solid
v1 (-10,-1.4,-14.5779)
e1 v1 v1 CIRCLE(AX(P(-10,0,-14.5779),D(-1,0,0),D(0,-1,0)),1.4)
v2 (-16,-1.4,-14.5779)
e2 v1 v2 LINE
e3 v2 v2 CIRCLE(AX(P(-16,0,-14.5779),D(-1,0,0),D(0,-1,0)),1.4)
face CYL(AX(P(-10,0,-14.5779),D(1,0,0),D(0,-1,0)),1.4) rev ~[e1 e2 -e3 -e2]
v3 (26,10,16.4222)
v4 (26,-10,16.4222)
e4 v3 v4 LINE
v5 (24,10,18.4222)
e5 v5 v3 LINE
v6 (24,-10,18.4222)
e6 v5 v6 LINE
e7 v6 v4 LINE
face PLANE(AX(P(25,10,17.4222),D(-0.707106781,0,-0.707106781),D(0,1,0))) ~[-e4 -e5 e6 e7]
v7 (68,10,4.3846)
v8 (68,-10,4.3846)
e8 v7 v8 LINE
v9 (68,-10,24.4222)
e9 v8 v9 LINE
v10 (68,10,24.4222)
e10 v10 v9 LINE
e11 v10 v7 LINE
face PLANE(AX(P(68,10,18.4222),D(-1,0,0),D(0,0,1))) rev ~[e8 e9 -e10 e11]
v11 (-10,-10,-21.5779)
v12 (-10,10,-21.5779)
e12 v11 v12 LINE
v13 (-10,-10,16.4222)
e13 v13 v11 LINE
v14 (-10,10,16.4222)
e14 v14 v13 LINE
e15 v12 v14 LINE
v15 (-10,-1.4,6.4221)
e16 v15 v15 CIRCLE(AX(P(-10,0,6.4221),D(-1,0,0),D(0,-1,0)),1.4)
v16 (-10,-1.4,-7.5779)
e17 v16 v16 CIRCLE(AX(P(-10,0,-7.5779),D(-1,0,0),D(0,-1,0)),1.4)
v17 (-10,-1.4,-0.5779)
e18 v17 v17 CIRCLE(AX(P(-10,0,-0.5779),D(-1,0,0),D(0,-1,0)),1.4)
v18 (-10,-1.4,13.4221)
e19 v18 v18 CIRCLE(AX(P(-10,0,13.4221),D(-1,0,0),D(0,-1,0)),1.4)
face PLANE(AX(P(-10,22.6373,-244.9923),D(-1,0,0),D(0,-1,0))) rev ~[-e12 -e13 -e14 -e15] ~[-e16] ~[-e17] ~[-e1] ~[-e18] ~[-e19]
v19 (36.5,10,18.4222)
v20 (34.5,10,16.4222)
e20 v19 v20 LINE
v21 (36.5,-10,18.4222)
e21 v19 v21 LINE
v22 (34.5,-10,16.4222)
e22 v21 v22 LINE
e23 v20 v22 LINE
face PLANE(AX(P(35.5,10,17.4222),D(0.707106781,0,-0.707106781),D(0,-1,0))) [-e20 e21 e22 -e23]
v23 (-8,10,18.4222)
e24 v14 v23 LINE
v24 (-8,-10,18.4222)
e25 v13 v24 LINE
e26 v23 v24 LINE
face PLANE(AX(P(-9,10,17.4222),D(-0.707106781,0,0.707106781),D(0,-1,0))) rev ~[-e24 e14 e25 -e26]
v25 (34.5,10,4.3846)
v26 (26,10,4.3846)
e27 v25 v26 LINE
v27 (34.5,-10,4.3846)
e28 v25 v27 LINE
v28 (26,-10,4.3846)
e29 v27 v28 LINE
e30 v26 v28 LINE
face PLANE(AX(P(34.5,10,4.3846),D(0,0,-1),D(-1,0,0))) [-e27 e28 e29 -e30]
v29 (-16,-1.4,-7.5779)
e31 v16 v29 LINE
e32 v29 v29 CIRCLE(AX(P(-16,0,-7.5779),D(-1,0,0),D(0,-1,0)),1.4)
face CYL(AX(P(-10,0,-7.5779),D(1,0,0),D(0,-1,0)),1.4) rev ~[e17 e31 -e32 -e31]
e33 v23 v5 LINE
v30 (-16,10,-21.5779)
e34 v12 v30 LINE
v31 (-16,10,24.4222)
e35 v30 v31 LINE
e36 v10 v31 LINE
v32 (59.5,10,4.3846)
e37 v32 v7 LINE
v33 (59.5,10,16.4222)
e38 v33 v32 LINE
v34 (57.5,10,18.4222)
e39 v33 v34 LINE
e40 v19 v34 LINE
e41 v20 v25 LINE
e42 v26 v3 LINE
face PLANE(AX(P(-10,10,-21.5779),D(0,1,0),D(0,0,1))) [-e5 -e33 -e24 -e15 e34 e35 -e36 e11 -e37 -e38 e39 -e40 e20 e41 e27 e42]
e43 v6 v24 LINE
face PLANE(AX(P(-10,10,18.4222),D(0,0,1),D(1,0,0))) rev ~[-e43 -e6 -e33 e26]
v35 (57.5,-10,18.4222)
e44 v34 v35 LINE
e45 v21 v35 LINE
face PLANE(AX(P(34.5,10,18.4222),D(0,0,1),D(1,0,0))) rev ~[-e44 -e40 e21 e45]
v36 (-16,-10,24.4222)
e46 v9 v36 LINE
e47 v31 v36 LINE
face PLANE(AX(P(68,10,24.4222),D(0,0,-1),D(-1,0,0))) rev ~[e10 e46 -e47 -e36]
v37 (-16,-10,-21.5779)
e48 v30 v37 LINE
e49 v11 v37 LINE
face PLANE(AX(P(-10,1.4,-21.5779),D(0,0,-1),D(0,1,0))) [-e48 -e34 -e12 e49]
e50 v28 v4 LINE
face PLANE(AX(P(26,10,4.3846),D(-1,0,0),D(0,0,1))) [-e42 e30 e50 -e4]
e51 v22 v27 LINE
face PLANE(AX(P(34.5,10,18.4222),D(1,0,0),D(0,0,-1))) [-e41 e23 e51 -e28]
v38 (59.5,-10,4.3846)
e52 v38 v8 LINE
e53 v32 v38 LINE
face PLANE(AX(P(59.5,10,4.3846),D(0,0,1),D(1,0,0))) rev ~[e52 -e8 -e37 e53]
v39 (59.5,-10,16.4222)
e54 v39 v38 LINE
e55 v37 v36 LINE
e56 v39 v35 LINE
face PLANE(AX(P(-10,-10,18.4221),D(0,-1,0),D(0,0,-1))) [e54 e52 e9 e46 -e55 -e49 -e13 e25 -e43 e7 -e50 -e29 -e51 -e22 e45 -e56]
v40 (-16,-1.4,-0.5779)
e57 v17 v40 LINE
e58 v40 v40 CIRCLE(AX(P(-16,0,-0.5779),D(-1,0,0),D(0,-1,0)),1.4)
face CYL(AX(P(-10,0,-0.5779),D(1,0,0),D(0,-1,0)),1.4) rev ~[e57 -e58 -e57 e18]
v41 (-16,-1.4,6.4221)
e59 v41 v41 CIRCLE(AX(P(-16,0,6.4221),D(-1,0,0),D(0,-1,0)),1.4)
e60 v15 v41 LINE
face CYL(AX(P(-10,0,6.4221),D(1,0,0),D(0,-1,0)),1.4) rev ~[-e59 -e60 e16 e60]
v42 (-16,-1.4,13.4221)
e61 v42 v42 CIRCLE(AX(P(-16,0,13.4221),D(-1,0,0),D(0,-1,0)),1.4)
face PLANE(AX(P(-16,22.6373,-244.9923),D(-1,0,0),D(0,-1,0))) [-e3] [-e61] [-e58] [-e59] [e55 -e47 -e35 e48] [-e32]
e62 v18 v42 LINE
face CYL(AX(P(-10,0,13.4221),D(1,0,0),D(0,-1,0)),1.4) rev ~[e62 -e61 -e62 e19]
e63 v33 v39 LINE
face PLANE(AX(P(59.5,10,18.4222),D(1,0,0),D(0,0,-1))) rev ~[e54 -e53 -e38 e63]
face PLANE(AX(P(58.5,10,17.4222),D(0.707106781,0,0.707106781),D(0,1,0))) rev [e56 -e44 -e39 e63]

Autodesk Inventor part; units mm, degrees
ref_plane "YZ Plane" through (0, 0, 0) normal (1, 0, 0) x (0, 1, 0)
ref_plane "XZ Plane" through (0, 0, 0) normal (0, 1, 0) x (-1, 0, 0)
ref_plane "XY Plane" through (0, 0, 0) normal (0, 0, 1) x (1, 0, 0)
ref_plane "Work Plane1" through (-10, 22.6373, -244.9923) normal (-1, 0, 0) x (0, -1, 0)
sketch "Sketch1" plane through (-10, 22.6373, -244.9923) normal (-1, 0, 0) x (0, -1, 0)
  line L0 (26.6373, -5.0077) -> (32.6373, -5.0077) construction
  line L1 (32.6373, -5.0077) -> (32.6373, 244.9923) construction
  line L2 (26.6373, 244.9923) -> (32.6373, 244.9923) construction
  line L3 (26.6373, -5.0077) -> (26.6373, 244.9923) construction
  line L4 (12.6373, -5.0077) -> (18.6373, -5.0077) construction
  line L5 (18.6373, -5.0077) -> (18.6373, 244.9923) construction
  line L6 (12.6373, 244.9923) -> (18.6373, 244.9923) construction
  line L7 (12.6373, -5.0077) -> (12.6373, 244.9923) construction
  line L8 (12.6373, 223.4144) -> (32.6373, 223.4144) construction
  line L9 (32.6373, 223.4144) -> (32.6373, 263.4144) construction
  line L10 (32.6373, 263.4144) -> (12.6373, 263.4144) construction
  line L11 (12.6373, 263.4144) -> (12.6373, 223.4144) construction
  line L12 (12.6373, 263.4144) -> (32.6373, 263.4144) construction
  line L13 (32.6373, 263.4144) -> (32.6373, 223.4144) construction
  line L14 (32.6373, 223.4144) -> (12.6373, 223.4144) construction
  line L15 (12.6373, 223.4144) -> (12.6373, 263.4144) construction
  line L16 (12.6373, 263.4144) -> (32.6373, 263.4144)
  line L17 (32.6373, 263.4144) -> (32.6373, 223.4144)
  line L18 (32.6373, 223.4144) -> (12.6373, 223.4144)
  line L19 (12.6373, 223.4144) -> (12.6373, 263.4144)
  circle A0 centre (22.6373, 258.4144) radius 1.4
  circle A1 centre (22.6373, 251.4144) radius 1.4
  circle A2 centre (22.6373, 244.4144) radius 1.4
  circle A3 centre (22.6373, 237.4144) radius 1.4
  circle A4 centre (22.6373, 230.4144) radius 1.4
  circle A5 centre (22.6373, 223.4144) radius 1.4
  point P0 (22.6373, 244.9923)
  dimension "d0" = 40
  dimension "d1" = 20
  dimension "d2" = 2.8
  dimension "d3" = 5
  dimension "d4" = 10
  dimension "d7" = 7
extrude "Extrusion1" add sketch "Sketch1" along normal blind 6 contours L16 L17 L18 A5 L19 | A5 L18 picked at (22.1842, 223.5261)
sketch "Sketch2" plane through (-10, 10, 18.4222) normal (0, 1, 0) x (1, 0, 0)
  line L0 (0, 0) -> (0, 40) projected
  line L1 (0, 40) -> (-6, 40) projected
  line L2 (-6, 0) -> (-6, 40) projected
  line L3 (0, 0) -> (-6, 0) projected
  line L4 (-6, 40) -> (-6, 0) projected
  line L5 (-6, 0) -> (78, 0)
  line L6 (78, 0) -> (78, -6)
  line L7 (78, -6) -> (-6, -6)
  line L8 (-6, -6) -> (-6, 0)
  line L9 (36, 0) -> (44.5, 0)
  line L10 (44.5, 0) -> (44.5, 14.0376)
  line L11 (44.5, 14.0376) -> (36, 14.0376)
  line L12 (36, 14.0376) -> (36, 0)
  line L13 (78, 0) -> (69.5, 0)
  line L14 (69.5, 0) -> (69.5, 14.0376)
  line L15 (69.5, 14.0376) -> (78, 14.0376)
  line L16 (78, 14.0376) -> (78, 0)
  point P0 (10, 18.4222)
  dimension "d14" = 84
  dimension "d15" = 6
  dimension "d16" = 8.5
  dimension "d17" = 36
  dimension "d18" = 8.5
extrude "Extrusion2" add sketch "Sketch2" against normal up to surface (20 mm away) contours L5 L6 L7 L8 L3 | L12 L11 L10 L5 | L14 L15 L16 L5
chamfer "Chamfer1" distance 2 angle 45 4 edges at (-10, 0, 18.4222) (26, 0, 18.4222) (59.5, 0, 18.4222) (34.5, 0, 18.4222)
sketch "Sketch3" plane through (34.5, 10, 4.3845) normal (0, 0, -1) x (-1, 0, 0)
  circle A0 centre (7.15, -8.3308) radius 5.85 projected
  circle A1 centre (-27.35, -10) radius 5.85 projected
  circle A2 centre (-27.35, -10) radius 2.45
  circle A3 centre (7.15, -8.3308) radius 4.1 projected
  point P0 (34.5, -10)
  dimension "d26" = 4.9
extrude "Extrusion3" [suppressed]
properties part number "Neje_Endrole_Adapter"
